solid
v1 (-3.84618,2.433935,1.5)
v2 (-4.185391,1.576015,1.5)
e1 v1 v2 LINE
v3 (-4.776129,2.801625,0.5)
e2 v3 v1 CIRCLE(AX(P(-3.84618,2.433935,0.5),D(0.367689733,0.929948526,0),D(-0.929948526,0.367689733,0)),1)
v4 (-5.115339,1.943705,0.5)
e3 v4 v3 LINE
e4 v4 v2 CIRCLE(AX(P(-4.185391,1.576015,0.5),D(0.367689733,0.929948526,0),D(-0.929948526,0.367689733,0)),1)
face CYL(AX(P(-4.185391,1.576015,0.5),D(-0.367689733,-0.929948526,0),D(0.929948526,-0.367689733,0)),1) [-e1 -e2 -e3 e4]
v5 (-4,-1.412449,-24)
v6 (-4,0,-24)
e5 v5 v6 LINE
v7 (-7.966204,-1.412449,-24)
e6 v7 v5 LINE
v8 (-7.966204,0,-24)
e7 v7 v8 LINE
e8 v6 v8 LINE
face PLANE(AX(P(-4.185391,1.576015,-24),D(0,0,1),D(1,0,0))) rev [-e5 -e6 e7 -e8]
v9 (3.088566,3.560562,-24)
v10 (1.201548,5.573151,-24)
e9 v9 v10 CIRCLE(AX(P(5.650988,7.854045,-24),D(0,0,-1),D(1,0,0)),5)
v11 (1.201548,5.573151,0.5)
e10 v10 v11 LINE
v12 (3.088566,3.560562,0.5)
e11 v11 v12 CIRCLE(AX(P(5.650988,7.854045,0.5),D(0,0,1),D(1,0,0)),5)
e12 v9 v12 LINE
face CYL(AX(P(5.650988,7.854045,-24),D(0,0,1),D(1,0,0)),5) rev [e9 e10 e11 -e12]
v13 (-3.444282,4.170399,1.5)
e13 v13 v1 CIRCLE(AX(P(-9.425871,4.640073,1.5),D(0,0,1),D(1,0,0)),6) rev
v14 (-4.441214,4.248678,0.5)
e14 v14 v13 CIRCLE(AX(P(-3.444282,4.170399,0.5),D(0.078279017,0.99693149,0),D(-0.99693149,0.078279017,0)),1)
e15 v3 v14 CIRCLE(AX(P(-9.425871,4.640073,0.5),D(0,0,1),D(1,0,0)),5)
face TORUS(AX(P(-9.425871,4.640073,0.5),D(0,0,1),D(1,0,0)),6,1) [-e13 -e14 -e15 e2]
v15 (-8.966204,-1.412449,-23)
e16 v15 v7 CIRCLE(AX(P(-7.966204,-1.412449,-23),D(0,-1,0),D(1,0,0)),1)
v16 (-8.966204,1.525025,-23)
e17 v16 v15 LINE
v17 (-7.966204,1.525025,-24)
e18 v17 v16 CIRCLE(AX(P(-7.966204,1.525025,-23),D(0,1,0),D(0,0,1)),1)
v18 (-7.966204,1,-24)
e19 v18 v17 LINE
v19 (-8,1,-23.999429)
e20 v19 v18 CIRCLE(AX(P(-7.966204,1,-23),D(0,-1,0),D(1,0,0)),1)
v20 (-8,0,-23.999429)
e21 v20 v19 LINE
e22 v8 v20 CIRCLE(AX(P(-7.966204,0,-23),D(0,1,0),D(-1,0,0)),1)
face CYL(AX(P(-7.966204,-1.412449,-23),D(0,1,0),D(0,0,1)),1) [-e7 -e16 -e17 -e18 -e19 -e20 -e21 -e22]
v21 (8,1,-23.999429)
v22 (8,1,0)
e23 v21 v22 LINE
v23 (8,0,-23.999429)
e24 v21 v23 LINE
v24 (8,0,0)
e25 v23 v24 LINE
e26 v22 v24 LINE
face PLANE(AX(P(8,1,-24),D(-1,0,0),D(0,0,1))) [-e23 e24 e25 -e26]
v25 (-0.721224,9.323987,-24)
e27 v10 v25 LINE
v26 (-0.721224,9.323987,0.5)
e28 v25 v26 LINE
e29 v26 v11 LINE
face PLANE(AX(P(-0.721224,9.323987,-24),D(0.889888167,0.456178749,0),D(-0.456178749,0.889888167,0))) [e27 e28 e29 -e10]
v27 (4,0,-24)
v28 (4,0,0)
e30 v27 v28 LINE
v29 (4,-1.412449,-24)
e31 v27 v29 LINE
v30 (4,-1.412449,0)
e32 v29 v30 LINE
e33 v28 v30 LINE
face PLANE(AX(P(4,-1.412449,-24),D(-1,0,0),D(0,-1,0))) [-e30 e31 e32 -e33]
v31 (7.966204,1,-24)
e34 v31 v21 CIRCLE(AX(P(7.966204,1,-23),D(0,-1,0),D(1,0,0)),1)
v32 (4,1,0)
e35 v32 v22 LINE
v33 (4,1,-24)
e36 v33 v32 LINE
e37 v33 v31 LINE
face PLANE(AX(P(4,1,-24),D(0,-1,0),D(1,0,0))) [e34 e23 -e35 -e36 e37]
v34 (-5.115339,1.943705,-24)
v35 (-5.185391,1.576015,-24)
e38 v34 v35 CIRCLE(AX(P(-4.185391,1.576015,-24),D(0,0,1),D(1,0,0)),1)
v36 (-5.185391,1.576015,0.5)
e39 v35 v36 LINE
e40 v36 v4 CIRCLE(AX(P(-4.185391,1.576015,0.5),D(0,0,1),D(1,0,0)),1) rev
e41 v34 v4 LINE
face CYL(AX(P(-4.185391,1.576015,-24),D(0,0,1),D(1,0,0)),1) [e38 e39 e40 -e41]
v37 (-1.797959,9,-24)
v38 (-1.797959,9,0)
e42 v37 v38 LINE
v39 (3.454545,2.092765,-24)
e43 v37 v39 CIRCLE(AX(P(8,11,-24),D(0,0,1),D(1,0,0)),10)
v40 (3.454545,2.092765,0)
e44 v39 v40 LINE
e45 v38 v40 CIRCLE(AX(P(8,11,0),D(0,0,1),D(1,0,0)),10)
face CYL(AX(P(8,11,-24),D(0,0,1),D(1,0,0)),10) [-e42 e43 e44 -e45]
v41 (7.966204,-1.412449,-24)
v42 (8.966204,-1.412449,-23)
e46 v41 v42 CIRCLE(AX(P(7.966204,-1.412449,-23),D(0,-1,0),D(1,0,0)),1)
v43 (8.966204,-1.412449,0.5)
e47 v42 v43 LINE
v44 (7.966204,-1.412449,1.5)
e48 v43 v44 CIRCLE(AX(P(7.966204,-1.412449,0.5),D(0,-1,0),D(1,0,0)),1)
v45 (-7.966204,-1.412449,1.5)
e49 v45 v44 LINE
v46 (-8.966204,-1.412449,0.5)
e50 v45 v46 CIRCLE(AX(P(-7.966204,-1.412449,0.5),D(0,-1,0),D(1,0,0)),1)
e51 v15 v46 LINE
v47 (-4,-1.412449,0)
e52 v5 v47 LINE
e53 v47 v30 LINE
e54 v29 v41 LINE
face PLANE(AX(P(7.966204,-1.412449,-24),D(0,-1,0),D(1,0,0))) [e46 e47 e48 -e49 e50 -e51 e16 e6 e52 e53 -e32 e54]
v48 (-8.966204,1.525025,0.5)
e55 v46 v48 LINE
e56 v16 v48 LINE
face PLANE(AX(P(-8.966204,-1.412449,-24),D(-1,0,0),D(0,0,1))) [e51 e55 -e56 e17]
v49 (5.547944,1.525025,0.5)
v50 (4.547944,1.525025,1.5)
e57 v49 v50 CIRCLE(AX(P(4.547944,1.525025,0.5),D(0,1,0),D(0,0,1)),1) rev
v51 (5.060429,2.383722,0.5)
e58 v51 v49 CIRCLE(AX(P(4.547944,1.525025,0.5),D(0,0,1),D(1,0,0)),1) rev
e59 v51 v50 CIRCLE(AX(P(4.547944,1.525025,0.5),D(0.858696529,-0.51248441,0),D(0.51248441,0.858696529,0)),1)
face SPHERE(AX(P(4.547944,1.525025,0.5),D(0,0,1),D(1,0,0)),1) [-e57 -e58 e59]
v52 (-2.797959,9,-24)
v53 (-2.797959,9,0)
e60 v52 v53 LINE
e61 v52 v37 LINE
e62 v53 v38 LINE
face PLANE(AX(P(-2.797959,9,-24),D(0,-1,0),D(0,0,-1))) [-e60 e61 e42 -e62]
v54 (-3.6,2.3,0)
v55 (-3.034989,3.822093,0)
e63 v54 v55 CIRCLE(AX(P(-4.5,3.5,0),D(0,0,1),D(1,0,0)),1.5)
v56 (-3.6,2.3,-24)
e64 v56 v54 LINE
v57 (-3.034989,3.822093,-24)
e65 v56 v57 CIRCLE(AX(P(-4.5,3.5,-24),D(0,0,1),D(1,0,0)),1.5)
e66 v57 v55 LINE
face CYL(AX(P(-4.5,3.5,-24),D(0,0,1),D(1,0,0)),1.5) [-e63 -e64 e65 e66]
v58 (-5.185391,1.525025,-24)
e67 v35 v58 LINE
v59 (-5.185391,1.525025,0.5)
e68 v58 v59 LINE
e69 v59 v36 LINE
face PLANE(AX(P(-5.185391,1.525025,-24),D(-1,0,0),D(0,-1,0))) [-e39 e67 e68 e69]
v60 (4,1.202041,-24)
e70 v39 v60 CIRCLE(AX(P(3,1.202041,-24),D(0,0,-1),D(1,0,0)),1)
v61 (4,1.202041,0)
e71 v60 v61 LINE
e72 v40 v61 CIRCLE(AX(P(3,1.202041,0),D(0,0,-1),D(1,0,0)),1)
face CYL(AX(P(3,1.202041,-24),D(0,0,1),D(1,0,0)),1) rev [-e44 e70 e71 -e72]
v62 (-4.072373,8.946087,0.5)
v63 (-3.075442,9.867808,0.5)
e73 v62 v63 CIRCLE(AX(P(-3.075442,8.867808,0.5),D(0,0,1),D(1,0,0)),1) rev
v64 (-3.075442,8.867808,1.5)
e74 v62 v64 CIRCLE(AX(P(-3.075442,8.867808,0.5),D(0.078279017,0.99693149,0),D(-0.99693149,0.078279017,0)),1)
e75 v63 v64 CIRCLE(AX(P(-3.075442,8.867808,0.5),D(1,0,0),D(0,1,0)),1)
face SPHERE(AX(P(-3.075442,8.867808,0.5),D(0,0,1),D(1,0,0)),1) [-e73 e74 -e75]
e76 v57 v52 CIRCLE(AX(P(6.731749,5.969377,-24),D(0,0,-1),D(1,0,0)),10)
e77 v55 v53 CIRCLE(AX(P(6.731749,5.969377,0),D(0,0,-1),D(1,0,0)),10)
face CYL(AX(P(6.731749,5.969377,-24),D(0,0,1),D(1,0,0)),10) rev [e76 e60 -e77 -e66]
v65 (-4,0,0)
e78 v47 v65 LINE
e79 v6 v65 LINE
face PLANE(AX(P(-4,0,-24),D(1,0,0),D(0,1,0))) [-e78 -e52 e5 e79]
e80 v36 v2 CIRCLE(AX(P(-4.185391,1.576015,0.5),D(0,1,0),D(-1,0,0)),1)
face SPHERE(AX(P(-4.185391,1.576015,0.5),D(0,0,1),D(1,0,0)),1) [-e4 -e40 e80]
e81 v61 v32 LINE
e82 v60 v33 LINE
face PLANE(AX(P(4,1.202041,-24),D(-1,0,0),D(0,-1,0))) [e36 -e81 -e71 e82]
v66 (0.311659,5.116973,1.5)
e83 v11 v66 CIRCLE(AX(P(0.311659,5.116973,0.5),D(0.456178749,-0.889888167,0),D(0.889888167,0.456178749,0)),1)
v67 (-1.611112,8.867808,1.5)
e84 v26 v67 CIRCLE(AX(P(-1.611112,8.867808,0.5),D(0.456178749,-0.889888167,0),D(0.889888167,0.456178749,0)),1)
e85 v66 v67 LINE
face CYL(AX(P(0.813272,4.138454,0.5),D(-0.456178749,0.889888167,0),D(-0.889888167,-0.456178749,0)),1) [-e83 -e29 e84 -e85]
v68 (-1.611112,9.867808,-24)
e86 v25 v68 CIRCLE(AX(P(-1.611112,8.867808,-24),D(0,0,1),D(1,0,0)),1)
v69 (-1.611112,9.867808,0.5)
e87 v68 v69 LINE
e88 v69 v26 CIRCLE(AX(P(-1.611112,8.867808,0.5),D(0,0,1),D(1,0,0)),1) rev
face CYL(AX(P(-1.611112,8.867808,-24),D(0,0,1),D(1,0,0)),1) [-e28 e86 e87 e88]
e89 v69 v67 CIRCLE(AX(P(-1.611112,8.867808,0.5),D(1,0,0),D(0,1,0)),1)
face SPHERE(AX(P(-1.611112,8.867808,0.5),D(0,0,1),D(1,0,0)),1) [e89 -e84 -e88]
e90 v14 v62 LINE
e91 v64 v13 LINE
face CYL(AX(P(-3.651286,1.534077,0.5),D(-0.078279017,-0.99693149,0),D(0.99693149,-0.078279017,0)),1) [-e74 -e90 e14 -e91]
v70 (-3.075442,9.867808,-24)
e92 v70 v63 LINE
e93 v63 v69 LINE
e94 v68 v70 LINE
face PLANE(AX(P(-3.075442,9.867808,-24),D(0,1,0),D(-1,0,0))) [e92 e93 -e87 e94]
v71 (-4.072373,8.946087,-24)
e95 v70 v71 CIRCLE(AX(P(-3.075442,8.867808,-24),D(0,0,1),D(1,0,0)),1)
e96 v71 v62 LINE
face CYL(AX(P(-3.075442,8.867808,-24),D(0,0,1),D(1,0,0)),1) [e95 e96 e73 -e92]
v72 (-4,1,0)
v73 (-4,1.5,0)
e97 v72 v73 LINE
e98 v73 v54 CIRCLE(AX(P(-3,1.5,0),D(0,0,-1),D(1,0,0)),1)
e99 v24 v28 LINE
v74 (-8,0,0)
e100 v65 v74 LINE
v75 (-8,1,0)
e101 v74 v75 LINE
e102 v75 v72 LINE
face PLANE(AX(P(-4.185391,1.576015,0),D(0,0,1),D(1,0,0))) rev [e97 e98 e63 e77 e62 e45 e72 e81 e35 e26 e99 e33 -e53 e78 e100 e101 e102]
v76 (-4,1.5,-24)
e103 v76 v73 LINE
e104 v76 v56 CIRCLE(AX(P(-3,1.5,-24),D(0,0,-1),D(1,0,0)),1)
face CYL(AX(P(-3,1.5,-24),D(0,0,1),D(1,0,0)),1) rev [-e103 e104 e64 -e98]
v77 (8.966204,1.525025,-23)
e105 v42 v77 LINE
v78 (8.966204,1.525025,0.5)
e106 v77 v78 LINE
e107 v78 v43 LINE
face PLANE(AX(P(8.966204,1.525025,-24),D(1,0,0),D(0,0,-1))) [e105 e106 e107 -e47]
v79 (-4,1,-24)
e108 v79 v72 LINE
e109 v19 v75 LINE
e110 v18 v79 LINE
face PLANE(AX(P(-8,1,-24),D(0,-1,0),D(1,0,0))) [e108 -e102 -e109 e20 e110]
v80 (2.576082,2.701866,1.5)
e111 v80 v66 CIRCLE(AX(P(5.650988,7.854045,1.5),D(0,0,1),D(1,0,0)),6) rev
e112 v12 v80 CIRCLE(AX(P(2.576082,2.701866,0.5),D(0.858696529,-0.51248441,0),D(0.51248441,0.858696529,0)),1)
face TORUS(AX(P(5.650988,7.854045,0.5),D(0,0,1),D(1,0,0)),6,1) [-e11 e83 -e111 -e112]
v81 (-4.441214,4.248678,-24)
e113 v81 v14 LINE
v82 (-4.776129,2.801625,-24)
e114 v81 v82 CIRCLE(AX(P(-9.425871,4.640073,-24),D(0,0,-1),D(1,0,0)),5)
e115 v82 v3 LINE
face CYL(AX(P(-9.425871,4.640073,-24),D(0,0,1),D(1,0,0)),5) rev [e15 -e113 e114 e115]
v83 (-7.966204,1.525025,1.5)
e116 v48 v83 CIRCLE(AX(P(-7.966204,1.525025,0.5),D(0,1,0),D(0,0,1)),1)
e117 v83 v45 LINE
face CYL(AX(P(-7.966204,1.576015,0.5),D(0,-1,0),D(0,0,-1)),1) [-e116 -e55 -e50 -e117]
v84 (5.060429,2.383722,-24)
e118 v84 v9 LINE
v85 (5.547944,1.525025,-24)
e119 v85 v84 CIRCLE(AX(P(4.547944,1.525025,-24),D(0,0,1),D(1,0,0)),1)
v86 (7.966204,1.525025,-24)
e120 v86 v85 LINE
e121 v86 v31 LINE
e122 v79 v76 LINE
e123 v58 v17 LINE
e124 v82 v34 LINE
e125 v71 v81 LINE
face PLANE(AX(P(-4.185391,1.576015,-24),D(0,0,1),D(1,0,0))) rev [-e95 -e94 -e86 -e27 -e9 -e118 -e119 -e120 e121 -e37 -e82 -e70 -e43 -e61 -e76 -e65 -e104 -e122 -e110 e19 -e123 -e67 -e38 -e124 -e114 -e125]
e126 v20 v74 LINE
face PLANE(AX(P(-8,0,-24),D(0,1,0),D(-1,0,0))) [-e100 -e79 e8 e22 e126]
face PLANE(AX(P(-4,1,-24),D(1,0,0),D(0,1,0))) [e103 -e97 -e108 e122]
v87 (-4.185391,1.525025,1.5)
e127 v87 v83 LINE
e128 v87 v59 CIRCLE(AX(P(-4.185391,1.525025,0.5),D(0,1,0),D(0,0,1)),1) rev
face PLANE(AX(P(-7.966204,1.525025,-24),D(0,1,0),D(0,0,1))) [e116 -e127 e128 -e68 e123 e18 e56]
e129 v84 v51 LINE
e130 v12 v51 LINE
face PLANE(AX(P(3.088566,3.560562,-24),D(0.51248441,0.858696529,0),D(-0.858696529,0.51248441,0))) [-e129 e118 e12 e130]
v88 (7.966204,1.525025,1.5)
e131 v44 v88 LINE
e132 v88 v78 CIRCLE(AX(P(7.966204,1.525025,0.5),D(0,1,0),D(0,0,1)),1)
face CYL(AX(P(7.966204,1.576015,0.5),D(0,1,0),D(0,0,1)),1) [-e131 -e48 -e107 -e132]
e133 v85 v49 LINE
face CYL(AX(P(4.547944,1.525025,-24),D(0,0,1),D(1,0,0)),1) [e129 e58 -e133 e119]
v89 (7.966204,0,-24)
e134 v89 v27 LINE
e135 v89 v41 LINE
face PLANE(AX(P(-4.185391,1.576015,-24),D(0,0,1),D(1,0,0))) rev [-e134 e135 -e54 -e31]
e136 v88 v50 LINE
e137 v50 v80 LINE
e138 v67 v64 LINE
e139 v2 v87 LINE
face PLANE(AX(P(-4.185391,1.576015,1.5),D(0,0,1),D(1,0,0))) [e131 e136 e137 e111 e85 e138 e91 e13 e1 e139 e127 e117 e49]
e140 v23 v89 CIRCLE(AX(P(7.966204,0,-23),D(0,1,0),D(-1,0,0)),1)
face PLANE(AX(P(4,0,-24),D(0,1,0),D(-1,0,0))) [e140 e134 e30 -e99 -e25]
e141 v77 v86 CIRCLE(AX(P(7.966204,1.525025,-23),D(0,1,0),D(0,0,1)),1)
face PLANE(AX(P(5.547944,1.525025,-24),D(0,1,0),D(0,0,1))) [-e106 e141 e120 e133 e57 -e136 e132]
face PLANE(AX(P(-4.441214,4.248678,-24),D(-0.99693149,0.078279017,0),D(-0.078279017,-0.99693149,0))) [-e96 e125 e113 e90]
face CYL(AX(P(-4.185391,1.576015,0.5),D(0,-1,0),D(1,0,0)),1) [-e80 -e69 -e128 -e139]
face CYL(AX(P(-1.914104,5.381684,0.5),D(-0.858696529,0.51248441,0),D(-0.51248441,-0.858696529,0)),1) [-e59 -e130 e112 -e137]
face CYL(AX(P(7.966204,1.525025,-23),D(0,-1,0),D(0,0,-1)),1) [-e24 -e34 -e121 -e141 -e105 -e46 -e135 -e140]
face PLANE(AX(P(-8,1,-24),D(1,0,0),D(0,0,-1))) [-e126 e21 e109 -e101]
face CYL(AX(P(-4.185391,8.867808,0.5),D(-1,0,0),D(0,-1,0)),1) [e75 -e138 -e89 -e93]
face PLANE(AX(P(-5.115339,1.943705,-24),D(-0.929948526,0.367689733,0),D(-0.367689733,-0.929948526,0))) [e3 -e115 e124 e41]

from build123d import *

# Parameters (mm, degrees)
EXTRUSION1_DEPTH = 24
EXTRUSION2_START = 1.5
EXTRUSION2_DEPTH = 1.5
CONG_1_R         = 1


with BuildPart() as part:
    # Esquisse1 → Extrusion1 (new body)
    with BuildSketch(Plane.XY):
        with BuildLine():
            Line((-5.185390739, 1.525025478), (-5.185390739, 1.576014862))
            ThreePointArc((-5.185390739, 1.576014862), (-5.167721774, 1.763166505), (-5.115339265, 1.943704595))
            Line((-5.115339265, 1.943704595), (-4.776128633, 2.801624733))
            ThreePointArc((-4.776128633, 2.801624733), (-4.554638642, 3.512645897), (-4.441213812, 4.248678315))
            Line((-4.441213812, 4.248678315), (-4.072373491, 8.946086961))
            ThreePointArc((-4.072373491, 8.946086961), (-3.754309066, 9.602069144), (-3.075442001, 9.867807945))
            Line((-3.075442001, 9.867807945), (-1.611111903, 9.867807945))
            ThreePointArc((-1.611111903, 9.867807945), (-1.089661402, 9.721089477), (-0.721223737, 9.323986693))
            Line((-0.721223737, 9.323986693), (1.201547539, 5.573151281))
            ThreePointArc((1.201547539, 5.573151281), (2.003498303, 4.434130377), (3.08856632, 3.560562379))
            Line((3.08856632, 3.560562379), (5.060428728, 2.383722007))
            ThreePointArc((5.060428728, 2.383722007), (5.417566192, 2.018743813), (5.547944317, 1.525025478))
            Line((5.547944317, 1.525025478), (7.966203889, 1.525025478))
            Line((7.966203889, 1.525025478), (8.966203889, 1.525025478))
            Line((8.966203889, 1.525025478), (8.966203889, -1.412448643))
            Line((8.966203889, -1.412448643), (7.966203889, -1.412448643))
            Line((7.966203889, -1.412448643), (4, -1.412448643))
            Line((4, -1.412448643), (4, 0))
            Line((4, 0), (8, 0))
            Line((8, 0), (8, 1))
            Line((8, 1), (4, 1))
            Line((4, 1), (4, 1.202041029))
            ThreePointArc((4, 1.202041029), (3.852802865, 1.724273997), (3.454545455, 2.092764572))
            ThreePointArc((3.454545455, 2.092764572), (0.040046913, 4.946972092), (-1.797958971, 9))
            Line((-1.797958971, 9), (-2.797958971, 9))
            ThreePointArc((-2.797958971, 9), (-3.257790087, 6.426670848), (-3.034989317, 3.822092686))
            ThreePointArc((-3.034989317, 3.822092686), (-3.093760184, 2.977994654), (-3.6, 2.3))
            ThreePointArc((-3.6, 2.3), (-3.894427191, 1.947213595), (-4, 1.5))
            Line((-4, 1.5), (-4, 1))
            Line((-4, 1), (-8, 1))
            Line((-8, 1), (-8, 0))
            Line((-8, 0), (-4, 0))
            Line((-4, 0), (-4, -1.412448643))
            Line((-4, -1.412448643), (-7.966203889, -1.412448643))
            Line((-7.966203889, -1.412448643), (-8.966203889, -1.412448643))
            Line((-8.966203889, -1.412448643), (-8.966203889, 1.525025478))
            Line((-8.966203889, 1.525025478), (-7.966203889, 1.525025478))
            Line((-7.966203889, 1.525025478), (-5.185390739, 1.525025478))
        make_face()
    extrude(amount=-EXTRUSION1_DEPTH)

    # Esquisse2 → Extrusion2 (add)
    with BuildSketch(Plane.XY.offset(EXTRUSION2_START)):
        with BuildLine():
            Line((-4, -1.412448643), (4, -1.412448643))
            Line((4, -1.412448643), (8.966203889, -1.412448643))
            Line((8.966203889, -1.412448643), (8.966203889, 1.525025478))
            Line((8.966203889, 1.525025478), (5.547944317, 1.525025478))
            ThreePointArc((5.547944317, 1.525025478), (5.417566192, 2.018743813), (5.060428728, 2.383722007))
            Line((5.060428728, 2.383722007), (3.08856632, 3.560562379))
            ThreePointArc((3.08856632, 3.560562379), (2.003498303, 4.434130377), (1.201547539, 5.573151281))
            Line((1.201547539, 5.573151281), (-0.721223737, 9.323986693))
            ThreePointArc((-0.721223737, 9.323986693), (-1.089661402, 9.721089477), (-1.611111903, 9.867807945))
            Line((-1.611111903, 9.867807945), (-3.075442001, 9.867807945))
            ThreePointArc((-3.075442001, 9.867807945), (-3.754309066, 9.602069144), (-4.072373491, 8.946086961))
            Line((-4.072373491, 8.946086961), (-4.441213812, 4.248678315))
            ThreePointArc((-4.441213812, 4.248678315), (-4.554638642, 3.512645897), (-4.776128633, 2.801624733))
            Line((-4.776128633, 2.801624733), (-5.115339265, 1.943704595))
            ThreePointArc((-5.115339265, 1.943704595), (-5.167721774, 1.763166505), (-5.185390739, 1.576014862))
            Line((-5.185390739, 1.576014862), (-5.185390739, 1.525025478))
            Line((-5.185390739, 1.525025478), (-8.966203889, 1.525025478))
            Line((-8.966203889, 1.525025478), (-8.966203889, -1.412448643))
            Line((-8.966203889, -1.412448643), (-4, -1.412448643))
        make_face()
    extrude(amount=-EXTRUSION2_DEPTH)

    # Congé1
    # the kernel refuses this fillet: 1 mm, written as the material it takes off along each edge
    with BuildSketch(Plane(origin=(4.547944317, 1.525025478, 1.5), x_dir=(1, 0, 0), z_dir=(0, -1, 0))) as cong_1_piece_1:
        with BuildLine():
            CenterArc((1 - CONG_1_R, -CONG_1_R), CONG_1_R, 0, 90)
            Line((1, -CONG_1_R), (1, 0))
            Line((1, 0), (1 - CONG_1_R, 0))
        make_face()
    revolve(axis=Axis((4.547944317, 1.525025478, 1.5), (0, 0, 1)), revolution_arc=59.170542775, mode=Mode.SUBTRACT)
    with BuildSketch(Plane(origin=(5.060428728, 2.383722007, 1.5), x_dir=(-0.5124844104197742, -0.8586965290931928, 0), z_dir=(-0.8586965290931928, 0.5124844104197742, 0))) as cong_1_piece_2:
        with BuildLine():
            CenterArc((CONG_1_R, -CONG_1_R), CONG_1_R, 90, 90)
            Line((0, -CONG_1_R), (0, 0))
            Line((0, 0), (CONG_1_R, 0))
        make_face()
    extrude(amount=2.29634375, mode=Mode.SUBTRACT)
    with BuildSketch(Plane(origin=(5.650988372, 7.854045025, 1.5), x_dir=(-0.512484410419771, -0.8586965290931947, 0), z_dir=(0.8586965290931947, -0.512484410419771, 0))) as cong_1_piece_3:
        with BuildLine():
            CenterArc((5 + CONG_1_R, CONG_1_R), CONG_1_R, 180, 90)
            Line((5, CONG_1_R), (5, 0))
            Line((5, 0), (5 + CONG_1_R, 0))
        make_face()
    revolve(axis=Axis((5.650988372, 7.854045025, 1.5), (0, 0, -1)), revolution_arc=32.029740096, mode=Mode.SUBTRACT)
    with BuildSketch(Plane(origin=(1.201547539, 5.573151281, 1.5), x_dir=(-0.8898881666598102, -0.45617874878038983, 0), z_dir=(-0.45617874878038983, 0.8898881666598102, 0))) as cong_1_piece_4:
        with BuildLine():
            CenterArc((CONG_1_R, -CONG_1_R), CONG_1_R, 90, 90)
            Line((0, -CONG_1_R), (0, 0))
            Line((0, 0), (CONG_1_R, 0))
        make_face()
    extrude(amount=4.214951443, mode=Mode.SUBTRACT)
    with BuildSketch(Plane(origin=(-1.611111903, 8.867807945, 1.5), x_dir=(0.8898881666598123, 0.4561787487803857, 0), z_dir=(0.4561787487803857, -0.8898881666598123, 0))) as cong_1_piece_5:
        with BuildLine():
            CenterArc((1 - CONG_1_R, -CONG_1_R), CONG_1_R, 0, 90)
            Line((1, -CONG_1_R), (1, 0))
            Line((1, 0), (1 - CONG_1_R, 0))
        make_face()
    revolve(axis=Axis((-1.611111903, 8.867807945, 1.5), (0, 0, 1)), revolution_arc=62.859197321, mode=Mode.SUBTRACT)
    with BuildSketch(Plane(origin=(-5.185390739, 1.576014862, 1.5), x_dir=(1, 0, 0), z_dir=(0, -1, 0))) as cong_1_piece_6:
        with BuildLine():
            CenterArc((CONG_1_R, -CONG_1_R), CONG_1_R, 90, 90)
            Line((0, -CONG_1_R), (0, 0))
            Line((0, 0), (CONG_1_R, 0))
        make_face()
    extrude(amount=0.050989385, mode=Mode.SUBTRACT)
    with BuildSketch(Plane(origin=(-4.185390739, 1.576014862, 1.5), x_dir=(-0.9299485255595245, 0.3676897330762265, 0), z_dir=(0.3676897330762265, 0.9299485255595245, 0))) as cong_1_piece_7:
        with BuildLine():
            CenterArc((1 - CONG_1_R, -CONG_1_R), CONG_1_R, 0, 90)
            Line((1, -CONG_1_R), (1, 0))
            Line((1, 0), (1 - CONG_1_R, 0))
        make_face()
    revolve(axis=Axis((-4.185390739, 1.576014862, 1.5), (0, 0, 1)), revolution_arc=21.573207514, mode=Mode.SUBTRACT)
    with BuildSketch(Plane(origin=(-4.776128633, 2.801624733, 1.5), x_dir=(0.9299485255595272, -0.3676897330762192, 0), z_dir=(-0.3676897330762192, -0.9299485255595272, 0))) as cong_1_piece_8:
        with BuildLine():
            CenterArc((CONG_1_R, -CONG_1_R), CONG_1_R, 90, 90)
            Line((0, -CONG_1_R), (0, 0))
            Line((0, 0), (CONG_1_R, 0))
        make_face()
    extrude(amount=0.922545834, mode=Mode.SUBTRACT)
    with BuildSketch(Plane(origin=(-9.425871261, 4.640073399, 1.5), x_dir=(0.9969314898888016, -0.07827901678032455, 0), z_dir=(0.07827901678032455, 0.9969314898888016, 0))) as cong_1_piece_9:
        with BuildLine():
            CenterArc((5 + CONG_1_R, CONG_1_R), CONG_1_R, 180, 90)
            Line((5, CONG_1_R), (5, 0))
            Line((5, 0), (5 + CONG_1_R, 0))
        make_face()
    revolve(axis=Axis((-9.425871261, 4.640073399, 1.5), (0, 0, -1)), revolution_arc=17.083557109, mode=Mode.SUBTRACT)
    with BuildSketch(Plane(origin=(-4.072373491, 8.946086961, 1.5), x_dir=(0.9969314898888012, -0.07827901678032895, 0), z_dir=(-0.07827901678032895, -0.9969314898888012, 0))) as cong_1_piece_10:
        with BuildLine():
            CenterArc((CONG_1_R, -CONG_1_R), CONG_1_R, 90, 90)
            Line((0, -CONG_1_R), (0, 0))
            Line((0, 0), (CONG_1_R, 0))
        make_face()
    extrude(amount=4.711867058, mode=Mode.SUBTRACT)
    with BuildSketch(Plane(origin=(-3.075442001, 8.867807945, 1.5), x_dir=(0, 1, 0), z_dir=(1, 0, 0))) as cong_1_piece_11:
        with BuildLine():
            CenterArc((1 - CONG_1_R, -CONG_1_R), CONG_1_R, 0, 90)
            Line((1, -CONG_1_R), (1, 0))
            Line((1, 0), (1 - CONG_1_R, 0))
        make_face()
    revolve(axis=Axis((-3.075442001, 8.867807945, 1.5), (0, 0, 1)), revolution_arc=85.510349595, mode=Mode.SUBTRACT)
    with BuildSketch(Plane(origin=(-8.966203889, -3.912448643, -24), x_dir=(1, 0, 0), z_dir=(0, 1, 0)), Plane(origin=(8.966203889, 4.025025478, -24), x_dir=(-1, 0, 0), z_dir=(0, -1, 0)), Plane(origin=(-8.966203889, 4.025025478, 1.5), x_dir=(1, 0, 0), z_dir=(0, -1, 0))) as cong_1_piece_12:
        with BuildLine():
            CenterArc((CONG_1_R, -CONG_1_R), CONG_1_R, 90, 90)
            Line((0, -CONG_1_R), (0, 0))
            Line((0, 0), (CONG_1_R, 0))
        make_face()
    extrude(amount=7.937474121, mode=Mode.SUBTRACT)
    with BuildSketch(Plane(origin=(8.966203889, -3.912448643, 1.5), x_dir=(0, 0, -1), z_dir=(0, 1, 0))) as cong_1_piece_13:
        with BuildLine():
            CenterArc((CONG_1_R, CONG_1_R), CONG_1_R, 180, 90)
            Line((0, CONG_1_R), (0, 0))
            Line((0, 0), (CONG_1_R, 0))
        make_face()
    extrude(amount=7.937474121, mode=Mode.SUBTRACT)
    with BuildSketch(Plane(origin=(-1.611111903, 9.867807945, 1.5), x_dir=(0, -1, 0), z_dir=(-1, 0, 0))) as cong_1_piece_14:
        with BuildLine():
            CenterArc((CONG_1_R, -CONG_1_R), CONG_1_R, 90, 90)
            Line((0, -CONG_1_R), (0, 0))
            Line((0, 0), (CONG_1_R, 0))
        make_face()
    extrude(amount=1.464330098, mode=Mode.SUBTRACT)


solid = part.part
